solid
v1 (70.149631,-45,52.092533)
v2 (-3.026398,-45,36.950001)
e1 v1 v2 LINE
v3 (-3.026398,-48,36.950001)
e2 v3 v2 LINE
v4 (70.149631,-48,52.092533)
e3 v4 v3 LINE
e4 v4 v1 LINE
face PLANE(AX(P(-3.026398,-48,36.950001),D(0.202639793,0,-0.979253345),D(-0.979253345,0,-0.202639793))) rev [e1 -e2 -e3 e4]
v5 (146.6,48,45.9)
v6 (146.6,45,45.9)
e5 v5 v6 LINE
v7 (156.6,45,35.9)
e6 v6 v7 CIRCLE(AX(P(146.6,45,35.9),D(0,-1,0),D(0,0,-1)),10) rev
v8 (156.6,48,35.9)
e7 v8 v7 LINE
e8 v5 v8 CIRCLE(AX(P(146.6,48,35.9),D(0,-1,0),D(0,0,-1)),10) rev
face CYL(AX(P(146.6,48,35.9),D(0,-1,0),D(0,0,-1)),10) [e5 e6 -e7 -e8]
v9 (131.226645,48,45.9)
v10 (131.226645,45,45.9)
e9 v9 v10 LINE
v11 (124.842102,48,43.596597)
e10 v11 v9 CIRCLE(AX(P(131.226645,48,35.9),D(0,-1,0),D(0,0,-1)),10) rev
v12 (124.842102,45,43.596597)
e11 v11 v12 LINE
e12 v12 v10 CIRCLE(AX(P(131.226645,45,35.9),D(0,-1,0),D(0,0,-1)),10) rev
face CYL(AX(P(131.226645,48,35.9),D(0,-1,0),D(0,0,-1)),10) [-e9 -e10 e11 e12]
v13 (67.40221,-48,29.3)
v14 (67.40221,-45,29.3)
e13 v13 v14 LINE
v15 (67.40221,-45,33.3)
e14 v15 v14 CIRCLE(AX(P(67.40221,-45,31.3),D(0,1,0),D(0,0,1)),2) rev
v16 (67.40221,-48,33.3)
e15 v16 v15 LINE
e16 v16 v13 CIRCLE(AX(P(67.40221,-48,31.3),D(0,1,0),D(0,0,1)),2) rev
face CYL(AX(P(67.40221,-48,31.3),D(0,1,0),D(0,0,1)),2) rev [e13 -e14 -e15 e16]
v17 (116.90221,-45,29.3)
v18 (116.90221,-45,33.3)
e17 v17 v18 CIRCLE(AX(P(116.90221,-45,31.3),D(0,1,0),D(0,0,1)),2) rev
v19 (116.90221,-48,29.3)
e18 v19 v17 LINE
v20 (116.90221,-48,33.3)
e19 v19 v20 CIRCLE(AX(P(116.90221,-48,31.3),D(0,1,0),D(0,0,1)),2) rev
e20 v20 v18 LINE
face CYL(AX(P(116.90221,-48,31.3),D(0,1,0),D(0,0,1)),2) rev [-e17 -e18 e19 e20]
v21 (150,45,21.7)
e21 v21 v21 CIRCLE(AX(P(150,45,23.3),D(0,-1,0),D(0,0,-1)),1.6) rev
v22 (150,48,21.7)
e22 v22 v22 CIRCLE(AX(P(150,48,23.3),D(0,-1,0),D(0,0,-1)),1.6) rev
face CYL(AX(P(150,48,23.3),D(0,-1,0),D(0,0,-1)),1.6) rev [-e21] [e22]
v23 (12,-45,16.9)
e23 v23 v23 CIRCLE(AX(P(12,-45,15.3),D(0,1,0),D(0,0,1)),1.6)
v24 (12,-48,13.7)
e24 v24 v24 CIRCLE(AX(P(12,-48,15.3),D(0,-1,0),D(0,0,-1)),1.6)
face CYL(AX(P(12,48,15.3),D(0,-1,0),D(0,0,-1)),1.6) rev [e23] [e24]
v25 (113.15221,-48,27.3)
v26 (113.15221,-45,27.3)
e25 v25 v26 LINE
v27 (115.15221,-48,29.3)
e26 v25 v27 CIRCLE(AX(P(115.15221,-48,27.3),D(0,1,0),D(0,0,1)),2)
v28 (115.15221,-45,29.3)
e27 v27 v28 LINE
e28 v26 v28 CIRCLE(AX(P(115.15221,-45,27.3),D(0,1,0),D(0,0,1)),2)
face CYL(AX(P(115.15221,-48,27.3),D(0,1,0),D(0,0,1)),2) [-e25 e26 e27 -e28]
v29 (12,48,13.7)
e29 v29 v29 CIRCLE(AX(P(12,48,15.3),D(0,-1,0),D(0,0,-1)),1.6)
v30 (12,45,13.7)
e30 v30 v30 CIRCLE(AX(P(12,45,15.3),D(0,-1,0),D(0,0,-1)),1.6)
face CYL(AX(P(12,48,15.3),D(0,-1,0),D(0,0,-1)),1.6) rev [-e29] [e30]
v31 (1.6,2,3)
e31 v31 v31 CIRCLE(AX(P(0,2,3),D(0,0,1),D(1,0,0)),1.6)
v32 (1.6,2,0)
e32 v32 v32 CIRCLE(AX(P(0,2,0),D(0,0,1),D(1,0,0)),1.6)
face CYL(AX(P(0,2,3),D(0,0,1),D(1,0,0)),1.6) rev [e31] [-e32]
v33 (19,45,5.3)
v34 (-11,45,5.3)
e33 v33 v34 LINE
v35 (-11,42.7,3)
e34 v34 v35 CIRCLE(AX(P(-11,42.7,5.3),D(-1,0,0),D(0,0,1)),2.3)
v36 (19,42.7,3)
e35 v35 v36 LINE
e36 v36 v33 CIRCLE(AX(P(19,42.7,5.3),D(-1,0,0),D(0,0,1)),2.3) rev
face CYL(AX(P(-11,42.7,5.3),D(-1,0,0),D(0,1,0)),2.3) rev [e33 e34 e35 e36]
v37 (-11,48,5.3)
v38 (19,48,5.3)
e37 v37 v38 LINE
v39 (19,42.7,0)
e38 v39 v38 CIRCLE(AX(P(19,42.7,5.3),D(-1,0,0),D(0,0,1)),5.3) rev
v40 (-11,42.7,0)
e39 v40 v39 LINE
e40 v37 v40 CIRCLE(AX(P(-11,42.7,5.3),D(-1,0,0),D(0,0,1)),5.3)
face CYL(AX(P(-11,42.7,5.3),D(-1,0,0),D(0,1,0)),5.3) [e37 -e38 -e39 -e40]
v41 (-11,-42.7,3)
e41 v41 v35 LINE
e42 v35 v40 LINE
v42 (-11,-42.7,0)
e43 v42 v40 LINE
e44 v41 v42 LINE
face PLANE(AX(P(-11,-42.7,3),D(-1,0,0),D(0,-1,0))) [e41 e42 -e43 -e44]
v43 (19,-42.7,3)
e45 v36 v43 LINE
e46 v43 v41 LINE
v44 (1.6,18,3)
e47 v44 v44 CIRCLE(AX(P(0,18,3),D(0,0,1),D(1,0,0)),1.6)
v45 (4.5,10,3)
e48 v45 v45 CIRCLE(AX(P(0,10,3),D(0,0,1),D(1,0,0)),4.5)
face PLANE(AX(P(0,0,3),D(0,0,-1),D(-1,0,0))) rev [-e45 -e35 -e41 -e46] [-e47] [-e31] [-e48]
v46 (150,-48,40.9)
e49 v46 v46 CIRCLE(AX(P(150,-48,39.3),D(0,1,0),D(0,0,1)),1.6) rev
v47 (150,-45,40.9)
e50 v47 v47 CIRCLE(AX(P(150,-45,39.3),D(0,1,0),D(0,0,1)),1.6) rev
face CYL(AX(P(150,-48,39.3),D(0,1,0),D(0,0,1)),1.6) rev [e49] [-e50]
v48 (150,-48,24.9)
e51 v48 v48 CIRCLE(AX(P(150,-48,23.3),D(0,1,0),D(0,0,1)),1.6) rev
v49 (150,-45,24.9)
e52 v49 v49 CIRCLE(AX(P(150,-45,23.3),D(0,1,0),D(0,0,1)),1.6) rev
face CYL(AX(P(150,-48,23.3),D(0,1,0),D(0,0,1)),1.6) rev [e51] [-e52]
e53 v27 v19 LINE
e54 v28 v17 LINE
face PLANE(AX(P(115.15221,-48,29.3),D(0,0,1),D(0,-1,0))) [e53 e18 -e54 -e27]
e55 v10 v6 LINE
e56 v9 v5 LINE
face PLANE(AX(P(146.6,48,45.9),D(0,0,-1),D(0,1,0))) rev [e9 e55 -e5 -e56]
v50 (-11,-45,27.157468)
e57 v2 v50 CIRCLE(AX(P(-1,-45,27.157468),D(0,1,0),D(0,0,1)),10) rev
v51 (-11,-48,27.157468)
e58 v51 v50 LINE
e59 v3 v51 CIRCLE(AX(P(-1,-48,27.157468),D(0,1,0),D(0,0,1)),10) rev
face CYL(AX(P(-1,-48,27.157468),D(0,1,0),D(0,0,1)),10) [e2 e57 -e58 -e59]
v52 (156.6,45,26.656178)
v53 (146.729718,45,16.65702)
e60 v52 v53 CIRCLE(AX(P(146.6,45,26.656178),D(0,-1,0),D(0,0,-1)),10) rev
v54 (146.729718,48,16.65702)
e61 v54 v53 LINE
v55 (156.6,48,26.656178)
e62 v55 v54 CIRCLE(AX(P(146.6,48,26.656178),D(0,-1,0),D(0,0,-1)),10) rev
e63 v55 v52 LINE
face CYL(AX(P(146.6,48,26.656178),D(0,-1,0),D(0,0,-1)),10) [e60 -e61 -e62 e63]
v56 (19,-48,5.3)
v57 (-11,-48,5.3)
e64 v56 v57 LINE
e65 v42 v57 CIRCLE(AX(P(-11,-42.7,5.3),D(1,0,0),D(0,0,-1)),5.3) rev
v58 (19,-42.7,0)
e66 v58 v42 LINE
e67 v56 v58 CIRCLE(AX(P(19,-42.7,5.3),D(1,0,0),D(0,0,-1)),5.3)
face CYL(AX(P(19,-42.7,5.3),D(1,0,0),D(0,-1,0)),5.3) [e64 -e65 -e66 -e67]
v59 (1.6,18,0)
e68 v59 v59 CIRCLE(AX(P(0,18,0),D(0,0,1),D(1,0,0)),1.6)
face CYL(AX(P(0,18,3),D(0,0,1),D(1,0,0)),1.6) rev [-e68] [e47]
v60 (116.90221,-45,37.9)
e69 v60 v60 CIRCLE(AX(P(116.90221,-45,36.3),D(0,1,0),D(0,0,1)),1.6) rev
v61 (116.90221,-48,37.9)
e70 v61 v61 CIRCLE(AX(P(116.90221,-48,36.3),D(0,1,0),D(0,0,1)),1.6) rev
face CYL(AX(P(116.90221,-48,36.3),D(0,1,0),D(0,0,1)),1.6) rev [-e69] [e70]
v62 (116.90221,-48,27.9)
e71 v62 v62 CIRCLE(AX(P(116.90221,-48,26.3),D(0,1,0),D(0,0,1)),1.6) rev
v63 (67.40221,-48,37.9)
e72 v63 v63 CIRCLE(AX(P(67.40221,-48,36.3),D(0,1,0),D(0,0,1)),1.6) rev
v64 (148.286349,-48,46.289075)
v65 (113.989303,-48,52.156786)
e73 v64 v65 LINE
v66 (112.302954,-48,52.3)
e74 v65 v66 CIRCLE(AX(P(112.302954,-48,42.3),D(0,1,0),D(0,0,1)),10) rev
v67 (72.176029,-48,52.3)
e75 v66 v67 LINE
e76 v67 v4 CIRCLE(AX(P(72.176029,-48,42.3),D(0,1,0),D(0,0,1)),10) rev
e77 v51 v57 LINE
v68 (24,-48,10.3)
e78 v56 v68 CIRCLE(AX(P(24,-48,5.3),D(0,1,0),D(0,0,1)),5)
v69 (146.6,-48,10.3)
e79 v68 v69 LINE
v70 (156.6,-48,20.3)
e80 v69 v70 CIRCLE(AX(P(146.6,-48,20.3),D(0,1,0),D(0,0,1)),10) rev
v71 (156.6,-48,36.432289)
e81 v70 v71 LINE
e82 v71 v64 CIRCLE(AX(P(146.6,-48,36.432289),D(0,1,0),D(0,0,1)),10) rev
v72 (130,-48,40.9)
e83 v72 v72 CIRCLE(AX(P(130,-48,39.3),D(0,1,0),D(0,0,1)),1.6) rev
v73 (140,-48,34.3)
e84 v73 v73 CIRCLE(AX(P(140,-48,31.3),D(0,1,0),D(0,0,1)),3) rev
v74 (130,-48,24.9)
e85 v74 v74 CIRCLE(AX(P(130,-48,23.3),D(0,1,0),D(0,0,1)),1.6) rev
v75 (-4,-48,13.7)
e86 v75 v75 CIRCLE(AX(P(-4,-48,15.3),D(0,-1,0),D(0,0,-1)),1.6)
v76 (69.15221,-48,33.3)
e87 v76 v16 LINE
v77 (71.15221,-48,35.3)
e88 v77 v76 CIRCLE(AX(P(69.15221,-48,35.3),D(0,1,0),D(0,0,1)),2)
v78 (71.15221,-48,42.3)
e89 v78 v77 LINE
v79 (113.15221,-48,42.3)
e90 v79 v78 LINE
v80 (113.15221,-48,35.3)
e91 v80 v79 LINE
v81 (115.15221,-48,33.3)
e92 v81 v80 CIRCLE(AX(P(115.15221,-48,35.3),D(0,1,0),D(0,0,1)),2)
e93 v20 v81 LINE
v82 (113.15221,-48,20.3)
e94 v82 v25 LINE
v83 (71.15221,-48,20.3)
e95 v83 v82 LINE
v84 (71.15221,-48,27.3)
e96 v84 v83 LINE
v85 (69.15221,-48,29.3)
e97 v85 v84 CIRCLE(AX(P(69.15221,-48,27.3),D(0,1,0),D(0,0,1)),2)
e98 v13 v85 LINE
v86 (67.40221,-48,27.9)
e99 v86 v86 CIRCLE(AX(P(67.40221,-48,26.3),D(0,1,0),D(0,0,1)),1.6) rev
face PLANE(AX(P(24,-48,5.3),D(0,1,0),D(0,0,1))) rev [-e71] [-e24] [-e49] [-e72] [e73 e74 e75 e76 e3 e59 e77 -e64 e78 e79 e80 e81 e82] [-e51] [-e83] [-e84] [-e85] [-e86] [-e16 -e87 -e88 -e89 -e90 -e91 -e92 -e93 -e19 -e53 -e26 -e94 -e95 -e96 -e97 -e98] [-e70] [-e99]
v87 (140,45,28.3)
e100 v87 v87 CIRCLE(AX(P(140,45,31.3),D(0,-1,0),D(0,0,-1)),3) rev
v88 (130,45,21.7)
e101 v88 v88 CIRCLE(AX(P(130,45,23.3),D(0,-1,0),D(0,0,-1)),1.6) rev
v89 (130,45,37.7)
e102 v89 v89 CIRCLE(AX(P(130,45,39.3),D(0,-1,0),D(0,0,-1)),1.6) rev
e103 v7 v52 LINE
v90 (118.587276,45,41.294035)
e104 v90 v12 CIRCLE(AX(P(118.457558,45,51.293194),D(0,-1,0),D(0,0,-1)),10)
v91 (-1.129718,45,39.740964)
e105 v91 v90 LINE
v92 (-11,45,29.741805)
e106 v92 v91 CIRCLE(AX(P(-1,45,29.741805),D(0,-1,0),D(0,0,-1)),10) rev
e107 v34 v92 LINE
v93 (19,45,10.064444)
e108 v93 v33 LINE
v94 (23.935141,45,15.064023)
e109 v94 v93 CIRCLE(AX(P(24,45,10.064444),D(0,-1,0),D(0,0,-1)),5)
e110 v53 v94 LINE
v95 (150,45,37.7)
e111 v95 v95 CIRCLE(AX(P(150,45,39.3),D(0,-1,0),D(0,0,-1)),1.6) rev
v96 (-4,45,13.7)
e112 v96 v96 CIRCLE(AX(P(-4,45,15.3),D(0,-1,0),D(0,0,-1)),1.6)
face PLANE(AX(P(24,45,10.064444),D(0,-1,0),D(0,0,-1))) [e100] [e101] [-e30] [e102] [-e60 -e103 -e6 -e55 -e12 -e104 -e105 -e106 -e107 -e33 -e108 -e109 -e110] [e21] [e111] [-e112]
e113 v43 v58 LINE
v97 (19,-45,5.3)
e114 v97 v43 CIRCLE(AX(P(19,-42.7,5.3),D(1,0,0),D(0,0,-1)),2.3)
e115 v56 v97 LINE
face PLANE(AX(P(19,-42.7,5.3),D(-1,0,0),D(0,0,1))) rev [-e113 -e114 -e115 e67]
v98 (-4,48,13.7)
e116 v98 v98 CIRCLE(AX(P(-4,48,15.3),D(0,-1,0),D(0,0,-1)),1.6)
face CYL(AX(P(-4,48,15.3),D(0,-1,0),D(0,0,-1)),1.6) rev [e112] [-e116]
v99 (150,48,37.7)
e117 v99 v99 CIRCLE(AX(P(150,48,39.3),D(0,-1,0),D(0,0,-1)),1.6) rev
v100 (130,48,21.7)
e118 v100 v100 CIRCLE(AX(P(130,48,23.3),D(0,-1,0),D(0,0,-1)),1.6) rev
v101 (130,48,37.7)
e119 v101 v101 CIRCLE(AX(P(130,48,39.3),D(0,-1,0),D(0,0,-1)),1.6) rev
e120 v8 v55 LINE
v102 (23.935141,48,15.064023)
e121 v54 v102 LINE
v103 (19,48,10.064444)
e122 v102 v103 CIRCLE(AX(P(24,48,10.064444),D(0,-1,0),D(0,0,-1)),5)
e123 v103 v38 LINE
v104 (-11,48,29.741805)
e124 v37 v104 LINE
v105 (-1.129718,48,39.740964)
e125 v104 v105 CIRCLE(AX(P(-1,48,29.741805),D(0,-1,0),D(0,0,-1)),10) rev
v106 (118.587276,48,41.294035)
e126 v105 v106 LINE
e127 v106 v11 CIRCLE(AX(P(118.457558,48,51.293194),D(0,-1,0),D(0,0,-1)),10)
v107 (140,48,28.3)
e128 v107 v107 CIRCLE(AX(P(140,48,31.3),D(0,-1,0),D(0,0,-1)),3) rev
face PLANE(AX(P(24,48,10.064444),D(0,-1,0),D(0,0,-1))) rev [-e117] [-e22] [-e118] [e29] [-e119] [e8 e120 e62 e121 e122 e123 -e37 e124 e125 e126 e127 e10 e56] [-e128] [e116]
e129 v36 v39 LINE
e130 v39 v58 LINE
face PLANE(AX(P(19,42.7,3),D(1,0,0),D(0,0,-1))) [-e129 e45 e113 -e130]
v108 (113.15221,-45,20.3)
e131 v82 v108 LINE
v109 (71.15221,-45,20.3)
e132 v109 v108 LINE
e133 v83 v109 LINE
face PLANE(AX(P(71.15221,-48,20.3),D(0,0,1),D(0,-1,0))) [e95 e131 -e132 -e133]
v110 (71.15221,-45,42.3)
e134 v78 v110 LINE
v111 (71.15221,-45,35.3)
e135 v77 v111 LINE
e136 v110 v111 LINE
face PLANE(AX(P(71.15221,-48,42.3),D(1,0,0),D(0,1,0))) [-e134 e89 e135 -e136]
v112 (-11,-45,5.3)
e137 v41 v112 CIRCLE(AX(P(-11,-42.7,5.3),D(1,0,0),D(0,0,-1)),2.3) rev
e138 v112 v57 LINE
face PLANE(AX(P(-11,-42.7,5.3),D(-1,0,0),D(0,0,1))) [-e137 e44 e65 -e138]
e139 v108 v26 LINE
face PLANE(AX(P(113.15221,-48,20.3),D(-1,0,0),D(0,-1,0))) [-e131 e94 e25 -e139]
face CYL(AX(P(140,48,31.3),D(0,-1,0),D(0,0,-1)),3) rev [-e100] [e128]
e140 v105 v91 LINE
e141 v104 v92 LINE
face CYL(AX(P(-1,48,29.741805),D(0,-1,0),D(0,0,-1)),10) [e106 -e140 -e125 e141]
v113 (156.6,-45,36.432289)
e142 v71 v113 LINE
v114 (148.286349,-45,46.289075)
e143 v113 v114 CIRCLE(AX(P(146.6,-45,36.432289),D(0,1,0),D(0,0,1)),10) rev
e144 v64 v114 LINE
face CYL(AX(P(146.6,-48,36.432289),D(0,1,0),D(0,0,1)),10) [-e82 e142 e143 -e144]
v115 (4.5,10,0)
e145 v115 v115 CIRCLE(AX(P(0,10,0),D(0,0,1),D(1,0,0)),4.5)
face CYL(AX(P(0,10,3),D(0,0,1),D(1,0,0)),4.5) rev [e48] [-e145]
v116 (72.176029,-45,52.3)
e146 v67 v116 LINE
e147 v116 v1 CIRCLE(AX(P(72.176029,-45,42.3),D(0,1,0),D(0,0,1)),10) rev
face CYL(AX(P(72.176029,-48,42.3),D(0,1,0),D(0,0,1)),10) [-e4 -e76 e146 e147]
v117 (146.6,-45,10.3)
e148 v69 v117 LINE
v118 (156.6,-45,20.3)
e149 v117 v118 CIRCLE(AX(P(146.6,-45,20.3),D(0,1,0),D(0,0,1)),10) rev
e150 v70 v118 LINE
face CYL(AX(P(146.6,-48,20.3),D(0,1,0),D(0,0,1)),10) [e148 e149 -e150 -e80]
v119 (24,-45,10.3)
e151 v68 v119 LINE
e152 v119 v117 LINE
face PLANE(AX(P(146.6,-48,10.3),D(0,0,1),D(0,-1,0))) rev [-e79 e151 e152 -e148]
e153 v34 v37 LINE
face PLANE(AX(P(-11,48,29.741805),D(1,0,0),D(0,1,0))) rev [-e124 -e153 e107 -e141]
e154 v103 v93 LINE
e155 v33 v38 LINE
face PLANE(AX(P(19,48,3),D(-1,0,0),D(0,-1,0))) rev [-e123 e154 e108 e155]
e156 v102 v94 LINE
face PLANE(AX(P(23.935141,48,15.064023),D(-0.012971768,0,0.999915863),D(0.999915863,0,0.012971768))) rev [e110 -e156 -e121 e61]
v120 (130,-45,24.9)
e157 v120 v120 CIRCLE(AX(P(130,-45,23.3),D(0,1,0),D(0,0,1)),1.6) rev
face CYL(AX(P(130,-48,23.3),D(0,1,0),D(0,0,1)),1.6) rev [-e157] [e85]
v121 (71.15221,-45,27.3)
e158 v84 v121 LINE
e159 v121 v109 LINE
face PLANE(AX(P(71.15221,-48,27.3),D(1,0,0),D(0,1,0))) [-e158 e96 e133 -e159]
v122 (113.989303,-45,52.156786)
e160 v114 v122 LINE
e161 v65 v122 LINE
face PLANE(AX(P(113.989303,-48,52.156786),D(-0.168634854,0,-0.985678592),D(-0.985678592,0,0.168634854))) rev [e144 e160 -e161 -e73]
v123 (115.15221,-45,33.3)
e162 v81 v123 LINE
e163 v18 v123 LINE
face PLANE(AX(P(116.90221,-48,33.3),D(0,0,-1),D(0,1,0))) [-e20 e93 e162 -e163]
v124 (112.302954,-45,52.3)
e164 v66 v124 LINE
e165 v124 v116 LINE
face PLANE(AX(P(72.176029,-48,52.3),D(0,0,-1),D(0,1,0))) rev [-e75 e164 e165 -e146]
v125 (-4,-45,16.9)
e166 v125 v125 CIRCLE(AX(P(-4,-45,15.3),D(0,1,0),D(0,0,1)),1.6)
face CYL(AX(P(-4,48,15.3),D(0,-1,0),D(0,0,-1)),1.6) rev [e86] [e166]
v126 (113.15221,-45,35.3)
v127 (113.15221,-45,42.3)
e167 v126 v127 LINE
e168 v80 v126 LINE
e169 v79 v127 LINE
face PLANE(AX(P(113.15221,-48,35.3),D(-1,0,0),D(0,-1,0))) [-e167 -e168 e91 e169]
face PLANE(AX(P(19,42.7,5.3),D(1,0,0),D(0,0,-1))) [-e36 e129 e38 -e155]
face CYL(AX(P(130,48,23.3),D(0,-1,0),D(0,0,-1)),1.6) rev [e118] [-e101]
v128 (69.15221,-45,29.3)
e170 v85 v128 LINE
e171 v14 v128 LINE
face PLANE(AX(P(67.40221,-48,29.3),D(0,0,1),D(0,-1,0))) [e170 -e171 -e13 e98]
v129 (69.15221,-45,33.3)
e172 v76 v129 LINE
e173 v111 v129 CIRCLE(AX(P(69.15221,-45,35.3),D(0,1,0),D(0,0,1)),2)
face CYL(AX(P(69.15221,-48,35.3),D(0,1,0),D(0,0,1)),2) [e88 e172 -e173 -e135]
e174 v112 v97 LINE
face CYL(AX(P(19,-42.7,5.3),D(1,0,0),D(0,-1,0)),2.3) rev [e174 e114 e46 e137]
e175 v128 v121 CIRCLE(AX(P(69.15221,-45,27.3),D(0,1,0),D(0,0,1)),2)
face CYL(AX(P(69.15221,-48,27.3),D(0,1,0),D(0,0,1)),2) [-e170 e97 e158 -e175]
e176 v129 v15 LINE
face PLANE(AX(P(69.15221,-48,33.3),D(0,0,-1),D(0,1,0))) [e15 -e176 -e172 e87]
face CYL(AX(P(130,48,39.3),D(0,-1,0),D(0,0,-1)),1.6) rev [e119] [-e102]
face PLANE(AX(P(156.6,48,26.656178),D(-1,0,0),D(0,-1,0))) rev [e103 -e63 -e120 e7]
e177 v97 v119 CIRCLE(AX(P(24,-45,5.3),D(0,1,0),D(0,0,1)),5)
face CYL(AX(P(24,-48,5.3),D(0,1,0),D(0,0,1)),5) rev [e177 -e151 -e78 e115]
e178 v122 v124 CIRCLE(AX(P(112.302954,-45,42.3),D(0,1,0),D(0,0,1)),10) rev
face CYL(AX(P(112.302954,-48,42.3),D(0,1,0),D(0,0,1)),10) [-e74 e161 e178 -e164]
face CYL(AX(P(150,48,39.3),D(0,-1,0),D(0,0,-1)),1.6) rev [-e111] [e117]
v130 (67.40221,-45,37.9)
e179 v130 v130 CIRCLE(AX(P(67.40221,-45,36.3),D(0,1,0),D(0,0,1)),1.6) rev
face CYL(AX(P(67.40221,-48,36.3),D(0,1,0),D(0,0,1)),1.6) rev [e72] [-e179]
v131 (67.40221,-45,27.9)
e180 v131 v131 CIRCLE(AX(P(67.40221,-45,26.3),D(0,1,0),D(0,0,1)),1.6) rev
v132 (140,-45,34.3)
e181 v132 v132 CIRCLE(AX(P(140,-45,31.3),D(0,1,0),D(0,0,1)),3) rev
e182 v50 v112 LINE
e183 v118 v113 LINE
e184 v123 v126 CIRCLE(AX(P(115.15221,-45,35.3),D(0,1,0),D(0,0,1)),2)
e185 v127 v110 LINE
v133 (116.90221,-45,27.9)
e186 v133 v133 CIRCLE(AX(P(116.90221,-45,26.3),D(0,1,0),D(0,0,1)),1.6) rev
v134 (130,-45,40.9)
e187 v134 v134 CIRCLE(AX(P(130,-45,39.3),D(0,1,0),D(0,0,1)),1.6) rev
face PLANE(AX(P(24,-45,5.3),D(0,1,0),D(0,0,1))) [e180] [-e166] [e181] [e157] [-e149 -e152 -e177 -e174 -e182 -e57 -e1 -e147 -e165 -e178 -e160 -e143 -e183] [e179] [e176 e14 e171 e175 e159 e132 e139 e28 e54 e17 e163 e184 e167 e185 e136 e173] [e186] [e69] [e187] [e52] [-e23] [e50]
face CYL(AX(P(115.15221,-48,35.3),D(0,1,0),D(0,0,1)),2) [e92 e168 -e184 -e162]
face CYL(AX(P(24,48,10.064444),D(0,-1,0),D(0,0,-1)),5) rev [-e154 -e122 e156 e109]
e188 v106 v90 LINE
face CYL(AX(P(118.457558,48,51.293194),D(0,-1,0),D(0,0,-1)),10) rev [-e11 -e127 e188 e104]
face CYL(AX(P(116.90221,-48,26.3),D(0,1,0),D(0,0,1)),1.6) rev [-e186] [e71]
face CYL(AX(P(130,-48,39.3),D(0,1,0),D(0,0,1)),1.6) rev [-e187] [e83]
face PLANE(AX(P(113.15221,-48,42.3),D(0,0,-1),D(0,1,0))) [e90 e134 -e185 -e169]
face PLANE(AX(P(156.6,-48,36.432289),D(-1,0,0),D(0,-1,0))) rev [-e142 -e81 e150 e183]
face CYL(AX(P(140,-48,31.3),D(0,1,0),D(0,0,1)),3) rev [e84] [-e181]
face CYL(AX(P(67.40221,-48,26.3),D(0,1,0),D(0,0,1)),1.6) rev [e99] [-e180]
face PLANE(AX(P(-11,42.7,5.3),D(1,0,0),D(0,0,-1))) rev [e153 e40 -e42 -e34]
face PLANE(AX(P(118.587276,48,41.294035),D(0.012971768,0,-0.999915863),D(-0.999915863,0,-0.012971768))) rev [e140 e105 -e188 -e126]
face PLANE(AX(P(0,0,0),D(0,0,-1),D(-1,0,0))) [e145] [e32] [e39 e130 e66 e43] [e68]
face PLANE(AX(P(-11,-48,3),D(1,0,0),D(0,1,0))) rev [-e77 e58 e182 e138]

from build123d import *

# Parameters (mm, degrees)
ESBO_O11_W                   = 30
ESBO_O11_H                   = 85.4
FLANGE_BASE1_DEPTH           = 3
FURO_DE_DI_METRO_3_2_3_2_1_D = 3.2
FURO_DE_DI_METRO_9_0_9_1_D   = 9
ARESTA_FLANGE1_DEPTH         = 30
ARESTA_FLANGE1_START         = 3
ARESTA_FLANGE1_PROFILE_R     = 1.6
ARESTA_FLANGE1_PROFILE_R_2   = 3
ARESTA_FLANGE1_FLAT_DEPTH    = 3
ARESTA_FLANGE2_DEPTH         = 30
ARESTA_FLANGE2_START         = 3
ARESTA_FLANGE2_PROFILE_R     = 1.6
ARESTA_FLANGE2_PROFILE_R_2   = 3
ARESTA_FLANGE2_FLAT_DEPTH    = 3
ESBO_O28_R                   = 1.6
CORTE_EXTRUS_O1_DEPTH        = 191.983899845


# Sheet-metal steps are written as plain solids
with BuildPart() as part:
    # Esboço11 → Flange-base1 (new body)
    with BuildSketch(Plane(origin=(0, 0, 0), x_dir=(-1, 0, 0), z_dir=(0, 0, -1))):
        with Locations((-4, 0)):
            Rectangle(ESBO_O11_W, ESBO_O11_H)
    extrude(amount=-FLANGE_BASE1_DEPTH)

    # Furo de diâmetro Ø3.2 (3.2)1 (through all)
    with Locations(Plane.XY.offset(3)):
        with Locations((0, 18), (0, 2)):
            Hole(FURO_DE_DI_METRO_3_2_3_2_1_D / 2)

    # Furo de diâmetro Ø9.0 (9)1 (through all)
    with Locations(Plane.XY.offset(3)):
        with Locations((0, 10)):
            Hole(FURO_DE_DI_METRO_9_0_9_1_D / 2)

    # Aresta-Flange1 bend section (across the edge) → Aresta-Flange1 (add)
    with BuildSketch(Plane(origin=(-11, -45, 3), x_dir=(0, 1, 0), z_dir=(1, 0, 0))):
        with BuildLine():
            Line((-3, 2.3), (0, 2.3))
            ThreePointArc((0, 2.3), (0.673654403, 0.673654403), (2.3, 0))
            Line((2.3, 0), (2.3, -3))
            ThreePointArc((2.3, -3), (-1.44766594, -1.44766594), (-3, 2.3))
        make_face()
    extrude(amount=ARESTA_FLANGE1_DEPTH)

    # Aresta-Flange1 profile (on flange) → Aresta-Flange1 flat (add)
    with BuildSketch(Plane(origin=(0, -45, 3), x_dir=(1, 0, 0), z_dir=(0, -1, 0)).offset(ARESTA_FLANGE1_START)):
        with BuildLine():
            Line((148.286348541, 43.289074758), (113.989303003, 49.156785916))
            ThreePointArc((113.989303003, 49.156785916), (113.149163903, 49.264132154), (112.302954462, 49.3))
            Line((112.302954462, 49.3), (72.176029381, 49.3))
            ThreePointArc((72.176029381, 49.3), (71.15753405, 49.247998153), (70.149631446, 49.092533452))
            Line((70.149631446, 49.092533452), (-3.026397935, 33.950001079))
            ThreePointArc((-3.026397935, 33.950001079), (-8.754481909, 30.471579625), (-11, 24.157467627))
            Line((-11, 24.157467627), (-11, 2.3))
            Line((-11, 2.3), (19, 2.3))
            ThreePointArc((19, 2.3), (20.464466094, 5.835533906), (24, 7.3))
            Line((24, 7.3), (146.6, 7.3))
            ThreePointArc((146.6, 7.3), (153.671067812, 10.228932188), (156.6, 17.3))
            Line((156.6, 17.3), (156.6, 33.432288841))
            ThreePointArc((156.6, 33.432288841), (154.244065849, 39.879633822), (148.286348541, 43.289074758))
        make_face()
        with Locations((150, 20.3)):
            Circle(ARESTA_FLANGE1_PROFILE_R, mode=Mode.SUBTRACT)
        with Locations((130, 20.3)):
            Circle(ARESTA_FLANGE1_PROFILE_R, mode=Mode.SUBTRACT)
        with Locations((116.90221, 23.3)):
            Circle(ARESTA_FLANGE1_PROFILE_R, mode=Mode.SUBTRACT)
        with Locations((67.40221, 23.3)):
            Circle(ARESTA_FLANGE1_PROFILE_R, mode=Mode.SUBTRACT)
        with Locations((140, 28.3)):
            Circle(ARESTA_FLANGE1_PROFILE_R_2, mode=Mode.SUBTRACT)
        with Locations((116.90221, 33.3)):
            Circle(ARESTA_FLANGE1_PROFILE_R, mode=Mode.SUBTRACT)
        with Locations((150, 36.3)):
            Circle(ARESTA_FLANGE1_PROFILE_R, mode=Mode.SUBTRACT)
        with Locations((130, 36.3)):
            Circle(ARESTA_FLANGE1_PROFILE_R, mode=Mode.SUBTRACT)
        with BuildLine():
            Line((115.15221, 30.3), (116.90221, 30.3))
            ThreePointArc((116.90221, 30.3), (118.90221, 28.3), (116.90221, 26.3))
            Line((116.90221, 26.3), (115.15221, 26.3))
            ThreePointArc((115.15221, 26.3), (113.737996438, 25.714213562), (113.15221, 24.3))
            Line((113.15221, 24.3), (113.15221, 17.3))
            Line((113.15221, 17.3), (71.15221, 17.3))
            Line((71.15221, 17.3), (71.15221, 24.3))
            ThreePointArc((71.15221, 24.3), (70.566423562, 25.714213562), (69.15221, 26.3))
            Line((69.15221, 26.3), (67.40221, 26.3))
            ThreePointArc((67.40221, 26.3), (65.40221, 28.3), (67.40221, 30.3))
            Line((67.40221, 30.3), (69.15221, 30.3))
            ThreePointArc((69.15221, 30.3), (70.566423562, 30.885786438), (71.15221, 32.3))
            Line((71.15221, 32.3), (71.15221, 39.3))
            Line((71.15221, 39.3), (113.15221, 39.3))
            Line((113.15221, 39.3), (113.15221, 32.3))
            ThreePointArc((113.15221, 32.3), (113.737996438, 30.885786438), (115.15221, 30.3))
        make_face(mode=Mode.SUBTRACT)
        with Locations((67.40221, 33.3)):
            Circle(ARESTA_FLANGE1_PROFILE_R, mode=Mode.SUBTRACT)
    extrude(amount=-ARESTA_FLANGE1_FLAT_DEPTH)

    # Aresta-Flange2 bend section (across the edge) → Aresta-Flange2 (add)
    with BuildSketch(Plane(origin=(19, 45, 3), x_dir=(0, -1, 0), z_dir=(-1, 0, 0))):
        with BuildLine():
            Line((-3, 2.3), (0, 2.3))
            ThreePointArc((0, 2.3), (0.673654403, 0.673654403), (2.3, 0))
            Line((2.3, 0), (2.3, -3))
            ThreePointArc((2.3, -3), (-1.44766594, -1.44766594), (-3, 2.3))
        make_face()
    extrude(amount=ARESTA_FLANGE2_DEPTH)

    # Aresta-Flange2 profile (on flange) → Aresta-Flange2 flat (add)
    with BuildSketch(Plane(origin=(0, 45, 3), x_dir=(-1, 0, 0), z_dir=(0, 1, 0)).offset(ARESTA_FLANGE2_START)):
        with BuildLine():
            ThreePointArc((-118.587276174, 38.294035384), (-121.912170898, 38.908863825), (-124.842101896, 40.596597007))
            ThreePointArc((-124.842101896, 40.596597007), (-127.832972518, 42.306539483), (-131.226645302, 42.9))
            Line((-131.226645302, 42.9), (-146.6, 42.9))
            ThreePointArc((-146.6, 42.9), (-153.671067812, 39.971067812), (-156.6, 32.9))
            Line((-156.6, 32.9), (-156.6, 23.656178366))
            ThreePointArc((-156.6, 23.656178366), (-153.716782168, 16.631122382), (-146.729717684, 13.657019735))
            Line((-146.729717684, 13.657019735), (-23.935141158, 12.064022895))
            ThreePointArc((-23.935141158, 12.064022895), (-20.441608916, 10.576971572), (-19, 7.06444358))
            Line((-19, 7.06444358), (-19, 2.3))
            Line((-19, 2.3), (11, 2.3))
            Line((11, 2.3), (11, 26.741804962))
            ThreePointArc((11, 26.741804962), (8.116782168, 33.766860946), (1.129717684, 36.740963592))
            Line((1.129717684, 36.740963592), (-118.587276174, 38.294035384))
        make_face()
        with Locations((-130, 20.3)):
            Circle(ARESTA_FLANGE2_PROFILE_R, mode=Mode.SUBTRACT)
        with Locations((-150, 20.3)):
            Circle(ARESTA_FLANGE2_PROFILE_R, mode=Mode.SUBTRACT)
        with Locations((-130, 36.3)):
            Circle(ARESTA_FLANGE2_PROFILE_R, mode=Mode.SUBTRACT)
        with Locations((-140, 28.3)):
            Circle(ARESTA_FLANGE2_PROFILE_R_2, mode=Mode.SUBTRACT)
        with Locations((-150, 36.3)):
            Circle(ARESTA_FLANGE2_PROFILE_R, mode=Mode.SUBTRACT)
    extrude(amount=-ARESTA_FLANGE2_FLAT_DEPTH)

    # Esboço28 → Corte-extrusão1 (cut, through all)
    with BuildSketch(Plane.XZ.offset(48)):
        with Locations(Location((-4, 15.3, 0), (0, 0, 270))):
            Circle(ESBO_O28_R)
        with Locations(Location((12, 15.3, 0), (0, 0, 270))):
            Circle(ESBO_O28_R)
    extrude(amount=-CORTE_EXTRUS_O1_DEPTH, mode=Mode.SUBTRACT)


solid = part.part
